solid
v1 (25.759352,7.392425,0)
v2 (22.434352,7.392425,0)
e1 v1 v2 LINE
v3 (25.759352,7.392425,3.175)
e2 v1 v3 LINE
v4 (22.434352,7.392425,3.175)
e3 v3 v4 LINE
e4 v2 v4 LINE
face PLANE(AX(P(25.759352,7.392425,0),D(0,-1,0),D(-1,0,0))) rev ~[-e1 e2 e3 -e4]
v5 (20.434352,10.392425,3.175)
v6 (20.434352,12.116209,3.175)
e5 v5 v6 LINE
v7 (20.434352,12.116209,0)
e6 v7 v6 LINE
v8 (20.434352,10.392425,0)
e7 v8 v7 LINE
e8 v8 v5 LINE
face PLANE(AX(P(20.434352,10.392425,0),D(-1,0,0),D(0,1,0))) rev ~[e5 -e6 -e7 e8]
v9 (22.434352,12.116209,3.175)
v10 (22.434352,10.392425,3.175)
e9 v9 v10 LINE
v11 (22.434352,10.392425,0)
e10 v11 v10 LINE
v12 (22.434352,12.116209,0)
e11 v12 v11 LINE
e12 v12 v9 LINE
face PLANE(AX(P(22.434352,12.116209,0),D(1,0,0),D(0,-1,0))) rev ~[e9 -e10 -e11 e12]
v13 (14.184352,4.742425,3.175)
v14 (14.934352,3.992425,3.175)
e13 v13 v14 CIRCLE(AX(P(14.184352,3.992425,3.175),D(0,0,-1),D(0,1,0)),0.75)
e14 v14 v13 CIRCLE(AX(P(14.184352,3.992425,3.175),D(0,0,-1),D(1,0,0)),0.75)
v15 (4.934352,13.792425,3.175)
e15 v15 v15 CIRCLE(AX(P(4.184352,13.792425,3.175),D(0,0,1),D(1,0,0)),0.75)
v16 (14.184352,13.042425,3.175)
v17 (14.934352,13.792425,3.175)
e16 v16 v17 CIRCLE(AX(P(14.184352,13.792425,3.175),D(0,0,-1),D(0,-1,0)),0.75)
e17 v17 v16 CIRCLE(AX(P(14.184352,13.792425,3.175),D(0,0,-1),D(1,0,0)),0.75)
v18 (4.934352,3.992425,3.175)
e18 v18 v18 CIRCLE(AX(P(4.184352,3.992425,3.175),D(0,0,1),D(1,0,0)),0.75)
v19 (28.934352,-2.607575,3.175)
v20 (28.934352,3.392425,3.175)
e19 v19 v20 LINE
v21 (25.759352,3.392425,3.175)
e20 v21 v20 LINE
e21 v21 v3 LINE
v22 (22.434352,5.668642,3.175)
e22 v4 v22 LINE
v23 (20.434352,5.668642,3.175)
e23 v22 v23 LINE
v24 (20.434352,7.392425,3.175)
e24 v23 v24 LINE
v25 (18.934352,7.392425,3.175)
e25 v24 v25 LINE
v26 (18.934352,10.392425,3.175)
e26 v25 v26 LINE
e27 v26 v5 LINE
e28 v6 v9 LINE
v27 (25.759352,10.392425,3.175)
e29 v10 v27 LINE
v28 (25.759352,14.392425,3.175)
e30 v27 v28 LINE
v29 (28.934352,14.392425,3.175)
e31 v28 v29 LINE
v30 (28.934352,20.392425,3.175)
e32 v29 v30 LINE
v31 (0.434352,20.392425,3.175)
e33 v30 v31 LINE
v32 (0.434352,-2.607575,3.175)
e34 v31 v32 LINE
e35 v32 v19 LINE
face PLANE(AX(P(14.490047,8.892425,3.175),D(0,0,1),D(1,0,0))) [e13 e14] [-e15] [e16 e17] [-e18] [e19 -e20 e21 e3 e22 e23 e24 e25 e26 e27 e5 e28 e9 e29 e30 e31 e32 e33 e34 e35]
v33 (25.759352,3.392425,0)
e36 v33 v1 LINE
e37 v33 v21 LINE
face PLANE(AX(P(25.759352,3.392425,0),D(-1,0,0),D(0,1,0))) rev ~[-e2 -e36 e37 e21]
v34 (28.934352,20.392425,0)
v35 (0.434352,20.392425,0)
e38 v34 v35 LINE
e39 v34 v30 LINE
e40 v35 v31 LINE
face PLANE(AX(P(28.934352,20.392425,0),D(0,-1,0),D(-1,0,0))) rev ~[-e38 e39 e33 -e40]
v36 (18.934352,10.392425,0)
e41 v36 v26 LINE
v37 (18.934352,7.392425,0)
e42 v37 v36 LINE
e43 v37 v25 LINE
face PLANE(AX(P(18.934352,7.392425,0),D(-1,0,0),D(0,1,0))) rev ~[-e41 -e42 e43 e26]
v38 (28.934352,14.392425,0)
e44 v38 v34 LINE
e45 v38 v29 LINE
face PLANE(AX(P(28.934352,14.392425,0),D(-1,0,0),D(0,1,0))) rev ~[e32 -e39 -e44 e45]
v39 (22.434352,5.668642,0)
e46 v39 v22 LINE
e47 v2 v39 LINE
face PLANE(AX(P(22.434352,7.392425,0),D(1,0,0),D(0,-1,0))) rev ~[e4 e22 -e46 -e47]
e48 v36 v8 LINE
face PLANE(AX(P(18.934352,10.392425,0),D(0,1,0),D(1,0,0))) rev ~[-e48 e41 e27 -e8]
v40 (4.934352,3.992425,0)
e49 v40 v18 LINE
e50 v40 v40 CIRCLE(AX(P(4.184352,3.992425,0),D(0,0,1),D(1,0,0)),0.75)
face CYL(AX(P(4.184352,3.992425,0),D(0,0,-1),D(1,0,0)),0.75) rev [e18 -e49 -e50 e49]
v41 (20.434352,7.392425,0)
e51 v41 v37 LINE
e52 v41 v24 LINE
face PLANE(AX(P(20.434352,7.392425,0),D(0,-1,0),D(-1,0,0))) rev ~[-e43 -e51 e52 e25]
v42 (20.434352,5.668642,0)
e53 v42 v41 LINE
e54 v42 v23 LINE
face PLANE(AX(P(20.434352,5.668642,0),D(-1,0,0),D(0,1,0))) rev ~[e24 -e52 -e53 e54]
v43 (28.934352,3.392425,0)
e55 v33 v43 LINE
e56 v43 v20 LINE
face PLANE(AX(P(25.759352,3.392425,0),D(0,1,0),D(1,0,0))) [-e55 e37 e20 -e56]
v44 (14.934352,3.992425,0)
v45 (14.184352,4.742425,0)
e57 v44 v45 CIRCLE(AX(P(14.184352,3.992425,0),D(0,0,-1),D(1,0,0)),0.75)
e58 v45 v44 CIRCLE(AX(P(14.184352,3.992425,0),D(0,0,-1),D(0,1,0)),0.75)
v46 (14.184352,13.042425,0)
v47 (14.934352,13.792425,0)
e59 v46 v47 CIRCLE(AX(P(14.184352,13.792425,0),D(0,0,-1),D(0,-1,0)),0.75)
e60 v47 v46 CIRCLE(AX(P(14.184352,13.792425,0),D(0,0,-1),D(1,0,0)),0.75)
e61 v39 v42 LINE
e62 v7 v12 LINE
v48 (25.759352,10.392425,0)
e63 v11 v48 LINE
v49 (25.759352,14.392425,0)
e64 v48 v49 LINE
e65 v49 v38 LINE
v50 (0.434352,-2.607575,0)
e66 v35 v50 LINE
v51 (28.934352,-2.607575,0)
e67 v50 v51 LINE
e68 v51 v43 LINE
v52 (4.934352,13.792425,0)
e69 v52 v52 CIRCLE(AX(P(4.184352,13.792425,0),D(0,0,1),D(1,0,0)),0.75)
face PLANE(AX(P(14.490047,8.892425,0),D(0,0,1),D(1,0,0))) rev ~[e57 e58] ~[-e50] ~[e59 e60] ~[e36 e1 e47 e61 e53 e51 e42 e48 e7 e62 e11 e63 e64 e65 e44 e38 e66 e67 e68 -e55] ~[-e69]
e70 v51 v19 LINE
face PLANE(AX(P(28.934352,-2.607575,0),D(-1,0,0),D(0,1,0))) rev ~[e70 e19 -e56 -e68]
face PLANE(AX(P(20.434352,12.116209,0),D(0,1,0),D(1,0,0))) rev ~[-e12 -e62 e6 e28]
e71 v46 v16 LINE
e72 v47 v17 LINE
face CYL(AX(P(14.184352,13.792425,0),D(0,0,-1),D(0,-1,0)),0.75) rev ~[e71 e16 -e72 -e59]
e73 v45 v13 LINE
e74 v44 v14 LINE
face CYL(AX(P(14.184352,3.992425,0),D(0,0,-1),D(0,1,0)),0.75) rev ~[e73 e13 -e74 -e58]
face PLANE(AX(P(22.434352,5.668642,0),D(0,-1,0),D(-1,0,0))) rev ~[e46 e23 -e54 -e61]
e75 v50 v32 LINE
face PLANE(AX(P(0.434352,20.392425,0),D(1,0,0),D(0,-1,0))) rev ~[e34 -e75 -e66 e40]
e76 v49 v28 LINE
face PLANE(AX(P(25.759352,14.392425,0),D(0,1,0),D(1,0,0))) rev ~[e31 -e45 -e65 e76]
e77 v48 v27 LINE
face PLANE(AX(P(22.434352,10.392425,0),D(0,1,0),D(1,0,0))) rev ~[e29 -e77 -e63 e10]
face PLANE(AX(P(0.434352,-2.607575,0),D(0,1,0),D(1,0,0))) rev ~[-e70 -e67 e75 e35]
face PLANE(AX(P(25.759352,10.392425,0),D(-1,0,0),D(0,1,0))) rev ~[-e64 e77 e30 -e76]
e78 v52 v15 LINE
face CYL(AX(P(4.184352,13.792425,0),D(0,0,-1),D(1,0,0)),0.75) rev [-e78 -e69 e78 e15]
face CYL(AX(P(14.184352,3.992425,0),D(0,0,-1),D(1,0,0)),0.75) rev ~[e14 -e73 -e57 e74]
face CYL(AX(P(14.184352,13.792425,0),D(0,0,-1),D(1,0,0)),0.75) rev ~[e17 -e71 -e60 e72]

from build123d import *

# Parameters (mm, degrees)
F0_R     = 0.75
F0_W     = 3.175
F0_H     = 6
F1_DEPTH = 3.175


# Not quite as in the source:
# - a length typed as a fraction of an inch, garbled in the dataset ("3 / 203.2 mm" for 3/8 in), is restored


with BuildPart() as f1:
    # F0 (on Top) → F1 (new body)
    with BuildSketch(Plane.XY):
        Polygon((18.934352152, 7.3924250901), (18.934352152, 10.3924250901), (20.434352152, 10.3924250901), (20.434352152, 12.1162086725), (22.434352152, 12.1162086725), (22.434352152, 10.3924250901), (25.759352152, 10.3924250901), (25.759352152, 14.3924250901), (25.759352152, 20.3924250901), (0.434352152, 20.3924250901), (0.434352152, -2.6075749099), (25.759352152, -2.6075749099), (25.759352152, 3.3924250901), (25.759352152, 7.3924250901), (22.434352152, 7.3924250901), (22.434352152, 5.6686415076), (20.434352152, 5.6686415076), (20.434352152, 7.3924250901), align=None)
        with Locations((4.184352152, 3.9924250901)):
            Circle(F0_R, mode=Mode.SUBTRACT)
        with BuildLine():
            ThreePointArc((14.934352152, 3.9924250901), (13.6540220662, 3.4620950042), (14.184352152, 4.7424250901))
            ThreePointArc((14.184352152, 4.7424250901), (14.7146822379, 4.522755176), (14.934352152, 3.9924250901))
        make_face(mode=Mode.SUBTRACT)
        with Locations((4.184352152, 13.7924250901)):
            Circle(F0_R, mode=Mode.SUBTRACT)
        with BuildLine():
            ThreePointArc((14.184352152, 13.0424250901), (13.6540220662, 14.322755176), (14.934352152, 13.7924250901))
            ThreePointArc((14.934352152, 13.7924250901), (14.7146822379, 13.2620950042), (14.184352152, 13.0424250901))
        make_face(mode=Mode.SUBTRACT)
        with Locations((27.346852152, 17.3924250901)):
            Rectangle(F0_W, F0_H)
        with Locations((27.346852152, 0.3924250901)):
            Rectangle(F0_W, F0_H)
    extrude(amount=F1_DEPTH)


solid = f1.part
